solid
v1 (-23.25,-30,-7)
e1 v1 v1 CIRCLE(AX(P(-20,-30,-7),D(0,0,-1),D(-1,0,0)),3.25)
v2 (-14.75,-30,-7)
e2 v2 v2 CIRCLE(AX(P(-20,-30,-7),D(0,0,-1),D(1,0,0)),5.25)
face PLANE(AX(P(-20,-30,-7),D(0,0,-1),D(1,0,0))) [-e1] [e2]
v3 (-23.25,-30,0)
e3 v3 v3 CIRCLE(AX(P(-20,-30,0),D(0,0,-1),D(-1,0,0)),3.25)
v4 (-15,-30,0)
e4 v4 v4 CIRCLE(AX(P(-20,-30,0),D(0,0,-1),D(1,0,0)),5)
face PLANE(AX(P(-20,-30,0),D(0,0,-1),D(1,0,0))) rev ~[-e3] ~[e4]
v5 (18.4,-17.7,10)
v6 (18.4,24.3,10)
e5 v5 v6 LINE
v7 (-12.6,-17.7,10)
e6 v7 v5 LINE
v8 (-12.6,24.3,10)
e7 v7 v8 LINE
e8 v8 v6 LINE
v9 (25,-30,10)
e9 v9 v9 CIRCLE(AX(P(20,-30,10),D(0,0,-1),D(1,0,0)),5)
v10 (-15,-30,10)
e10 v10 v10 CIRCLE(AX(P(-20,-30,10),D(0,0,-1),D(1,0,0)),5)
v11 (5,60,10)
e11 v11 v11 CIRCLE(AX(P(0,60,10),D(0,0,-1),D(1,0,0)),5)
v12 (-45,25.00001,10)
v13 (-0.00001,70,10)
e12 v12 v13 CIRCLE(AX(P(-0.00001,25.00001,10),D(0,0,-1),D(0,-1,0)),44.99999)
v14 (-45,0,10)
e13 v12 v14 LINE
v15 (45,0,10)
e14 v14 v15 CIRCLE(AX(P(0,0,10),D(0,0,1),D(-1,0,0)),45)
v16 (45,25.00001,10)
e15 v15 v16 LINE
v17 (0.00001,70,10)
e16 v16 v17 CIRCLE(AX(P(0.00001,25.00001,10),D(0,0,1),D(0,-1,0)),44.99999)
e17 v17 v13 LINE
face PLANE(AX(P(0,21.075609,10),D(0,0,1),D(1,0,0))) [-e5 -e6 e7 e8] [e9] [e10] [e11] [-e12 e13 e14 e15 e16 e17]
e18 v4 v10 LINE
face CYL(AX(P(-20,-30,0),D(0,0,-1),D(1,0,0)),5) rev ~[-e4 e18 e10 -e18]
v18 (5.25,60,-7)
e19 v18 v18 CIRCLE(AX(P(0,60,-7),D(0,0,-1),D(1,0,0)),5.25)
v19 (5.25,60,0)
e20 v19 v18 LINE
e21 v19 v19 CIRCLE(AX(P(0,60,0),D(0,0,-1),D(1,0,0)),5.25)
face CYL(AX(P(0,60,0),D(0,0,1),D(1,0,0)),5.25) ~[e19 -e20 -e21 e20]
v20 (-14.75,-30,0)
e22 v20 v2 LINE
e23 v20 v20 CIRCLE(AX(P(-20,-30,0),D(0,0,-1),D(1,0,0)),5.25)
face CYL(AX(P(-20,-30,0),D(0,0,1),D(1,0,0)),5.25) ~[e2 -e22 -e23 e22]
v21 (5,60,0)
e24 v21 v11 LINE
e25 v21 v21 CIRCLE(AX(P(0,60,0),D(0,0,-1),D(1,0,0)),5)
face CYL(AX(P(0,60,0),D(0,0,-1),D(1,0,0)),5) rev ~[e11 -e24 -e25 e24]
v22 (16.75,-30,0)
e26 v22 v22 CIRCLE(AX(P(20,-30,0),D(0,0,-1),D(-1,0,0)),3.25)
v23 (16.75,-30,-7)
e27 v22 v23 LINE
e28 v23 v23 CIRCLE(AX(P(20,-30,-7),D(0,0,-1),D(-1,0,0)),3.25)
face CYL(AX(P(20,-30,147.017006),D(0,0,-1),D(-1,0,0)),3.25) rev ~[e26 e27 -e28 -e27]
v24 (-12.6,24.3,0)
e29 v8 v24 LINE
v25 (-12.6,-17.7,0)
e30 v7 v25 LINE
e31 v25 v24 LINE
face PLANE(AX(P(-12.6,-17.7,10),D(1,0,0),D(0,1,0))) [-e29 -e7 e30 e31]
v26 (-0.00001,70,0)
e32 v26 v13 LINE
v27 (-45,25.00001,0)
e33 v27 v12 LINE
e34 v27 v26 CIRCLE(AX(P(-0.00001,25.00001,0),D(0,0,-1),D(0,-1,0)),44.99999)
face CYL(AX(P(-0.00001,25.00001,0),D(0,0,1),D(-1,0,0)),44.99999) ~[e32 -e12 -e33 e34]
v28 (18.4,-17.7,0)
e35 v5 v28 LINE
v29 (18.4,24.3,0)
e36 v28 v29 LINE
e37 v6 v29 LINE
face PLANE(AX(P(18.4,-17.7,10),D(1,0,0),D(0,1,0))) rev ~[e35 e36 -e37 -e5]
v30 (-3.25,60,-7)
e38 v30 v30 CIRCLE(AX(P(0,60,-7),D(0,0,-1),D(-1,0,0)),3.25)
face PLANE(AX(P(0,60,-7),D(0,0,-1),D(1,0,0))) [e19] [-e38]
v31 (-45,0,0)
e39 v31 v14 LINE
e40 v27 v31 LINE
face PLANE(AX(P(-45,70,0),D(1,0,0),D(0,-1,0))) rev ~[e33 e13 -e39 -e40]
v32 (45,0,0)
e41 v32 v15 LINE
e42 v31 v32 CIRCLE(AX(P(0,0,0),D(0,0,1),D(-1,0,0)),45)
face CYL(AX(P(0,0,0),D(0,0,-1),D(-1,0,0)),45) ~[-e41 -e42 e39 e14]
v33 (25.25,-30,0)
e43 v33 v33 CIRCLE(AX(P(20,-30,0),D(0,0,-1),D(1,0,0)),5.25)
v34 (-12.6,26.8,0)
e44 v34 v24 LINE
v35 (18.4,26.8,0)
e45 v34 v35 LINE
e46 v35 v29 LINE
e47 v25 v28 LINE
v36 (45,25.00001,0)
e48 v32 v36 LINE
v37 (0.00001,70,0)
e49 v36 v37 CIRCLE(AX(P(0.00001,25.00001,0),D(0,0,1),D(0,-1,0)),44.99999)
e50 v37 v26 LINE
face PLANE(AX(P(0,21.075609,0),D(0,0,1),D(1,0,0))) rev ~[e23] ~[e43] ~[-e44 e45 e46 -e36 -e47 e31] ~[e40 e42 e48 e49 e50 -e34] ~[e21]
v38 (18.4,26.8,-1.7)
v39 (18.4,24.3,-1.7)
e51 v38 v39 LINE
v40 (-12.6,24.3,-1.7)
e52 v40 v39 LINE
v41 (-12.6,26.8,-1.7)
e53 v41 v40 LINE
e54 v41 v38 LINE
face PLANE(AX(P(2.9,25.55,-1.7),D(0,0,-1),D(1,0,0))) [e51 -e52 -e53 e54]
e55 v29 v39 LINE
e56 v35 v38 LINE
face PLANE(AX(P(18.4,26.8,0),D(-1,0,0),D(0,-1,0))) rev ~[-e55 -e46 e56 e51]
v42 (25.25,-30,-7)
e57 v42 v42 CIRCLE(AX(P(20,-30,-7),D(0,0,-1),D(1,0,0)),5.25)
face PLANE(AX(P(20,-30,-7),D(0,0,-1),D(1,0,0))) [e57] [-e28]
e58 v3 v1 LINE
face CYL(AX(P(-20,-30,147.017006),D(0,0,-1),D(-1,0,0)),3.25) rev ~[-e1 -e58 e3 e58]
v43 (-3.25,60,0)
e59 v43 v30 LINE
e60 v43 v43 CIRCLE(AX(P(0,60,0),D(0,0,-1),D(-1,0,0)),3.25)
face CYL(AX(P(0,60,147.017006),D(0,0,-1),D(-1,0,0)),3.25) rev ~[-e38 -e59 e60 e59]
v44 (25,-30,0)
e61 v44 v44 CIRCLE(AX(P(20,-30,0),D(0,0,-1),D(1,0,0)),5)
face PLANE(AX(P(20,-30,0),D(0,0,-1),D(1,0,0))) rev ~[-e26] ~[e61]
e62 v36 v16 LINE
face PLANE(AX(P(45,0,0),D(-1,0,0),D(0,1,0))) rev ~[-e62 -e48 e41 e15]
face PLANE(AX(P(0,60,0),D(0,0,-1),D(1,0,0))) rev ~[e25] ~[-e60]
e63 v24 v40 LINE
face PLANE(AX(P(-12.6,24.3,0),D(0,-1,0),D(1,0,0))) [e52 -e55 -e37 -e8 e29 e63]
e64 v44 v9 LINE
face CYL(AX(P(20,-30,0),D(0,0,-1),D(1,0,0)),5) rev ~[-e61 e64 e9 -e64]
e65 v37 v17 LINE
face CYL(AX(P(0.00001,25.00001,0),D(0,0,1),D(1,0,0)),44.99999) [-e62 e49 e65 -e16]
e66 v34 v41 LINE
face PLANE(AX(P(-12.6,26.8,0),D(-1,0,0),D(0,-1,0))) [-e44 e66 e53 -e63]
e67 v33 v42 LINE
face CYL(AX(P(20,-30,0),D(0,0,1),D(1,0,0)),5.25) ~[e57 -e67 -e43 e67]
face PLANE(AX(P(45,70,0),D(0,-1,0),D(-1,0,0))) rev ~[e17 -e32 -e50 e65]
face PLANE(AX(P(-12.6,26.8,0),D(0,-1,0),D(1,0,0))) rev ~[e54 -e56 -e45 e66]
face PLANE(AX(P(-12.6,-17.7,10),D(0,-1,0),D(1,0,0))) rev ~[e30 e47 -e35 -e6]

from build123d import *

# Parameters (mm, degrees)
F1_DEPTH    = 10
F3_R        = 44.99999
F4_W        = 31
F4_H        = 42
F5_DEPTH    = 11
F6_R        = 5.25
F7_DEPTH    = 7
F9_D        = 10
F9_DEPTH    = 10.001
F10_D       = 6.5
F10_ON_F6_D = 6.5
F11_W       = 31
F11_H       = 2.5
F12_DEPTH   = 1.7


# Not quite as in the source:
# - a fillet or chamfer is up to 0.001 mm smaller than in the source, because OpenCascade refuses the exact size


with BuildPart() as f1:
    # F0 (on Top) → F1 (new body)
    with BuildSketch(Plane.XY):
        with BuildLine():
            Line((-45, 70), (-45, 0))
            ThreePointArc((-45, 0), (0, -45), (45, 0))
            Line((45, 0), (45, 70))
            Line((45, 70), (-45, 70))
        make_face()
    extrude(amount=F1_DEPTH)

    # F3 (radius 45 in the source; OpenCascade refuses exactly that, so slightly less here)
    f3_edges = [f1.edges().sort_by_distance(p)[0] for p in [
        (-45, 70, 5),
        (45, 70, 5),
    ]]
    fillet(f3_edges, radius=F3_R)

    # F4 (on face) → F5 (cut)
    with BuildSketch(Plane.XY.offset(10)):
        with Locations((2.9, 3.3)):
            Rectangle(F4_W, F4_H)
    extrude(amount=-F5_DEPTH, mode=Mode.SUBTRACT)

    # F6 (on face) → F7 (join)
    with BuildSketch(Plane(origin=(0, 0, 0), x_dir=(1, 0, 0), z_dir=(0, 0, -1))):
        with Locations((0, -60)):
            Circle(F6_R)
        with Locations((-20, 30)):
            Circle(F6_R)
        with Locations((20, 30)):
            Circle(F6_R)
    extrude(amount=F7_DEPTH)

    # F9 (through all, one way)
    with BuildSketch(Plane(origin=(0, 0, 0), x_dir=(1, 0, 0), z_dir=(0, 0, -1))):
        with Locations((-20, 30), (20, 30), (0, -60)):
            Circle(F9_D / 2)
    extrude(amount=-F9_DEPTH, mode=Mode.SUBTRACT)

    # F10 (through all)
    with Locations(Plane.XY):
        with Locations((20, -30), (0, 60)):
            Hole(F10_D / 2)

    # F10 on F6 (through all)
    with Locations(Plane.XY):
        with Locations((-20, -30)):
            Hole(F10_ON_F6_D / 2)

    # F11 (on face) → F12 (join)
    with BuildSketch(Plane(origin=(0, 0, 0), x_dir=(1, 0, 0), z_dir=(0, 0, -1))):
        with Locations((2.9, -25.55)):
            Rectangle(F11_W, F11_H)
    extrude(amount=F12_DEPTH)


solid = f1.part
